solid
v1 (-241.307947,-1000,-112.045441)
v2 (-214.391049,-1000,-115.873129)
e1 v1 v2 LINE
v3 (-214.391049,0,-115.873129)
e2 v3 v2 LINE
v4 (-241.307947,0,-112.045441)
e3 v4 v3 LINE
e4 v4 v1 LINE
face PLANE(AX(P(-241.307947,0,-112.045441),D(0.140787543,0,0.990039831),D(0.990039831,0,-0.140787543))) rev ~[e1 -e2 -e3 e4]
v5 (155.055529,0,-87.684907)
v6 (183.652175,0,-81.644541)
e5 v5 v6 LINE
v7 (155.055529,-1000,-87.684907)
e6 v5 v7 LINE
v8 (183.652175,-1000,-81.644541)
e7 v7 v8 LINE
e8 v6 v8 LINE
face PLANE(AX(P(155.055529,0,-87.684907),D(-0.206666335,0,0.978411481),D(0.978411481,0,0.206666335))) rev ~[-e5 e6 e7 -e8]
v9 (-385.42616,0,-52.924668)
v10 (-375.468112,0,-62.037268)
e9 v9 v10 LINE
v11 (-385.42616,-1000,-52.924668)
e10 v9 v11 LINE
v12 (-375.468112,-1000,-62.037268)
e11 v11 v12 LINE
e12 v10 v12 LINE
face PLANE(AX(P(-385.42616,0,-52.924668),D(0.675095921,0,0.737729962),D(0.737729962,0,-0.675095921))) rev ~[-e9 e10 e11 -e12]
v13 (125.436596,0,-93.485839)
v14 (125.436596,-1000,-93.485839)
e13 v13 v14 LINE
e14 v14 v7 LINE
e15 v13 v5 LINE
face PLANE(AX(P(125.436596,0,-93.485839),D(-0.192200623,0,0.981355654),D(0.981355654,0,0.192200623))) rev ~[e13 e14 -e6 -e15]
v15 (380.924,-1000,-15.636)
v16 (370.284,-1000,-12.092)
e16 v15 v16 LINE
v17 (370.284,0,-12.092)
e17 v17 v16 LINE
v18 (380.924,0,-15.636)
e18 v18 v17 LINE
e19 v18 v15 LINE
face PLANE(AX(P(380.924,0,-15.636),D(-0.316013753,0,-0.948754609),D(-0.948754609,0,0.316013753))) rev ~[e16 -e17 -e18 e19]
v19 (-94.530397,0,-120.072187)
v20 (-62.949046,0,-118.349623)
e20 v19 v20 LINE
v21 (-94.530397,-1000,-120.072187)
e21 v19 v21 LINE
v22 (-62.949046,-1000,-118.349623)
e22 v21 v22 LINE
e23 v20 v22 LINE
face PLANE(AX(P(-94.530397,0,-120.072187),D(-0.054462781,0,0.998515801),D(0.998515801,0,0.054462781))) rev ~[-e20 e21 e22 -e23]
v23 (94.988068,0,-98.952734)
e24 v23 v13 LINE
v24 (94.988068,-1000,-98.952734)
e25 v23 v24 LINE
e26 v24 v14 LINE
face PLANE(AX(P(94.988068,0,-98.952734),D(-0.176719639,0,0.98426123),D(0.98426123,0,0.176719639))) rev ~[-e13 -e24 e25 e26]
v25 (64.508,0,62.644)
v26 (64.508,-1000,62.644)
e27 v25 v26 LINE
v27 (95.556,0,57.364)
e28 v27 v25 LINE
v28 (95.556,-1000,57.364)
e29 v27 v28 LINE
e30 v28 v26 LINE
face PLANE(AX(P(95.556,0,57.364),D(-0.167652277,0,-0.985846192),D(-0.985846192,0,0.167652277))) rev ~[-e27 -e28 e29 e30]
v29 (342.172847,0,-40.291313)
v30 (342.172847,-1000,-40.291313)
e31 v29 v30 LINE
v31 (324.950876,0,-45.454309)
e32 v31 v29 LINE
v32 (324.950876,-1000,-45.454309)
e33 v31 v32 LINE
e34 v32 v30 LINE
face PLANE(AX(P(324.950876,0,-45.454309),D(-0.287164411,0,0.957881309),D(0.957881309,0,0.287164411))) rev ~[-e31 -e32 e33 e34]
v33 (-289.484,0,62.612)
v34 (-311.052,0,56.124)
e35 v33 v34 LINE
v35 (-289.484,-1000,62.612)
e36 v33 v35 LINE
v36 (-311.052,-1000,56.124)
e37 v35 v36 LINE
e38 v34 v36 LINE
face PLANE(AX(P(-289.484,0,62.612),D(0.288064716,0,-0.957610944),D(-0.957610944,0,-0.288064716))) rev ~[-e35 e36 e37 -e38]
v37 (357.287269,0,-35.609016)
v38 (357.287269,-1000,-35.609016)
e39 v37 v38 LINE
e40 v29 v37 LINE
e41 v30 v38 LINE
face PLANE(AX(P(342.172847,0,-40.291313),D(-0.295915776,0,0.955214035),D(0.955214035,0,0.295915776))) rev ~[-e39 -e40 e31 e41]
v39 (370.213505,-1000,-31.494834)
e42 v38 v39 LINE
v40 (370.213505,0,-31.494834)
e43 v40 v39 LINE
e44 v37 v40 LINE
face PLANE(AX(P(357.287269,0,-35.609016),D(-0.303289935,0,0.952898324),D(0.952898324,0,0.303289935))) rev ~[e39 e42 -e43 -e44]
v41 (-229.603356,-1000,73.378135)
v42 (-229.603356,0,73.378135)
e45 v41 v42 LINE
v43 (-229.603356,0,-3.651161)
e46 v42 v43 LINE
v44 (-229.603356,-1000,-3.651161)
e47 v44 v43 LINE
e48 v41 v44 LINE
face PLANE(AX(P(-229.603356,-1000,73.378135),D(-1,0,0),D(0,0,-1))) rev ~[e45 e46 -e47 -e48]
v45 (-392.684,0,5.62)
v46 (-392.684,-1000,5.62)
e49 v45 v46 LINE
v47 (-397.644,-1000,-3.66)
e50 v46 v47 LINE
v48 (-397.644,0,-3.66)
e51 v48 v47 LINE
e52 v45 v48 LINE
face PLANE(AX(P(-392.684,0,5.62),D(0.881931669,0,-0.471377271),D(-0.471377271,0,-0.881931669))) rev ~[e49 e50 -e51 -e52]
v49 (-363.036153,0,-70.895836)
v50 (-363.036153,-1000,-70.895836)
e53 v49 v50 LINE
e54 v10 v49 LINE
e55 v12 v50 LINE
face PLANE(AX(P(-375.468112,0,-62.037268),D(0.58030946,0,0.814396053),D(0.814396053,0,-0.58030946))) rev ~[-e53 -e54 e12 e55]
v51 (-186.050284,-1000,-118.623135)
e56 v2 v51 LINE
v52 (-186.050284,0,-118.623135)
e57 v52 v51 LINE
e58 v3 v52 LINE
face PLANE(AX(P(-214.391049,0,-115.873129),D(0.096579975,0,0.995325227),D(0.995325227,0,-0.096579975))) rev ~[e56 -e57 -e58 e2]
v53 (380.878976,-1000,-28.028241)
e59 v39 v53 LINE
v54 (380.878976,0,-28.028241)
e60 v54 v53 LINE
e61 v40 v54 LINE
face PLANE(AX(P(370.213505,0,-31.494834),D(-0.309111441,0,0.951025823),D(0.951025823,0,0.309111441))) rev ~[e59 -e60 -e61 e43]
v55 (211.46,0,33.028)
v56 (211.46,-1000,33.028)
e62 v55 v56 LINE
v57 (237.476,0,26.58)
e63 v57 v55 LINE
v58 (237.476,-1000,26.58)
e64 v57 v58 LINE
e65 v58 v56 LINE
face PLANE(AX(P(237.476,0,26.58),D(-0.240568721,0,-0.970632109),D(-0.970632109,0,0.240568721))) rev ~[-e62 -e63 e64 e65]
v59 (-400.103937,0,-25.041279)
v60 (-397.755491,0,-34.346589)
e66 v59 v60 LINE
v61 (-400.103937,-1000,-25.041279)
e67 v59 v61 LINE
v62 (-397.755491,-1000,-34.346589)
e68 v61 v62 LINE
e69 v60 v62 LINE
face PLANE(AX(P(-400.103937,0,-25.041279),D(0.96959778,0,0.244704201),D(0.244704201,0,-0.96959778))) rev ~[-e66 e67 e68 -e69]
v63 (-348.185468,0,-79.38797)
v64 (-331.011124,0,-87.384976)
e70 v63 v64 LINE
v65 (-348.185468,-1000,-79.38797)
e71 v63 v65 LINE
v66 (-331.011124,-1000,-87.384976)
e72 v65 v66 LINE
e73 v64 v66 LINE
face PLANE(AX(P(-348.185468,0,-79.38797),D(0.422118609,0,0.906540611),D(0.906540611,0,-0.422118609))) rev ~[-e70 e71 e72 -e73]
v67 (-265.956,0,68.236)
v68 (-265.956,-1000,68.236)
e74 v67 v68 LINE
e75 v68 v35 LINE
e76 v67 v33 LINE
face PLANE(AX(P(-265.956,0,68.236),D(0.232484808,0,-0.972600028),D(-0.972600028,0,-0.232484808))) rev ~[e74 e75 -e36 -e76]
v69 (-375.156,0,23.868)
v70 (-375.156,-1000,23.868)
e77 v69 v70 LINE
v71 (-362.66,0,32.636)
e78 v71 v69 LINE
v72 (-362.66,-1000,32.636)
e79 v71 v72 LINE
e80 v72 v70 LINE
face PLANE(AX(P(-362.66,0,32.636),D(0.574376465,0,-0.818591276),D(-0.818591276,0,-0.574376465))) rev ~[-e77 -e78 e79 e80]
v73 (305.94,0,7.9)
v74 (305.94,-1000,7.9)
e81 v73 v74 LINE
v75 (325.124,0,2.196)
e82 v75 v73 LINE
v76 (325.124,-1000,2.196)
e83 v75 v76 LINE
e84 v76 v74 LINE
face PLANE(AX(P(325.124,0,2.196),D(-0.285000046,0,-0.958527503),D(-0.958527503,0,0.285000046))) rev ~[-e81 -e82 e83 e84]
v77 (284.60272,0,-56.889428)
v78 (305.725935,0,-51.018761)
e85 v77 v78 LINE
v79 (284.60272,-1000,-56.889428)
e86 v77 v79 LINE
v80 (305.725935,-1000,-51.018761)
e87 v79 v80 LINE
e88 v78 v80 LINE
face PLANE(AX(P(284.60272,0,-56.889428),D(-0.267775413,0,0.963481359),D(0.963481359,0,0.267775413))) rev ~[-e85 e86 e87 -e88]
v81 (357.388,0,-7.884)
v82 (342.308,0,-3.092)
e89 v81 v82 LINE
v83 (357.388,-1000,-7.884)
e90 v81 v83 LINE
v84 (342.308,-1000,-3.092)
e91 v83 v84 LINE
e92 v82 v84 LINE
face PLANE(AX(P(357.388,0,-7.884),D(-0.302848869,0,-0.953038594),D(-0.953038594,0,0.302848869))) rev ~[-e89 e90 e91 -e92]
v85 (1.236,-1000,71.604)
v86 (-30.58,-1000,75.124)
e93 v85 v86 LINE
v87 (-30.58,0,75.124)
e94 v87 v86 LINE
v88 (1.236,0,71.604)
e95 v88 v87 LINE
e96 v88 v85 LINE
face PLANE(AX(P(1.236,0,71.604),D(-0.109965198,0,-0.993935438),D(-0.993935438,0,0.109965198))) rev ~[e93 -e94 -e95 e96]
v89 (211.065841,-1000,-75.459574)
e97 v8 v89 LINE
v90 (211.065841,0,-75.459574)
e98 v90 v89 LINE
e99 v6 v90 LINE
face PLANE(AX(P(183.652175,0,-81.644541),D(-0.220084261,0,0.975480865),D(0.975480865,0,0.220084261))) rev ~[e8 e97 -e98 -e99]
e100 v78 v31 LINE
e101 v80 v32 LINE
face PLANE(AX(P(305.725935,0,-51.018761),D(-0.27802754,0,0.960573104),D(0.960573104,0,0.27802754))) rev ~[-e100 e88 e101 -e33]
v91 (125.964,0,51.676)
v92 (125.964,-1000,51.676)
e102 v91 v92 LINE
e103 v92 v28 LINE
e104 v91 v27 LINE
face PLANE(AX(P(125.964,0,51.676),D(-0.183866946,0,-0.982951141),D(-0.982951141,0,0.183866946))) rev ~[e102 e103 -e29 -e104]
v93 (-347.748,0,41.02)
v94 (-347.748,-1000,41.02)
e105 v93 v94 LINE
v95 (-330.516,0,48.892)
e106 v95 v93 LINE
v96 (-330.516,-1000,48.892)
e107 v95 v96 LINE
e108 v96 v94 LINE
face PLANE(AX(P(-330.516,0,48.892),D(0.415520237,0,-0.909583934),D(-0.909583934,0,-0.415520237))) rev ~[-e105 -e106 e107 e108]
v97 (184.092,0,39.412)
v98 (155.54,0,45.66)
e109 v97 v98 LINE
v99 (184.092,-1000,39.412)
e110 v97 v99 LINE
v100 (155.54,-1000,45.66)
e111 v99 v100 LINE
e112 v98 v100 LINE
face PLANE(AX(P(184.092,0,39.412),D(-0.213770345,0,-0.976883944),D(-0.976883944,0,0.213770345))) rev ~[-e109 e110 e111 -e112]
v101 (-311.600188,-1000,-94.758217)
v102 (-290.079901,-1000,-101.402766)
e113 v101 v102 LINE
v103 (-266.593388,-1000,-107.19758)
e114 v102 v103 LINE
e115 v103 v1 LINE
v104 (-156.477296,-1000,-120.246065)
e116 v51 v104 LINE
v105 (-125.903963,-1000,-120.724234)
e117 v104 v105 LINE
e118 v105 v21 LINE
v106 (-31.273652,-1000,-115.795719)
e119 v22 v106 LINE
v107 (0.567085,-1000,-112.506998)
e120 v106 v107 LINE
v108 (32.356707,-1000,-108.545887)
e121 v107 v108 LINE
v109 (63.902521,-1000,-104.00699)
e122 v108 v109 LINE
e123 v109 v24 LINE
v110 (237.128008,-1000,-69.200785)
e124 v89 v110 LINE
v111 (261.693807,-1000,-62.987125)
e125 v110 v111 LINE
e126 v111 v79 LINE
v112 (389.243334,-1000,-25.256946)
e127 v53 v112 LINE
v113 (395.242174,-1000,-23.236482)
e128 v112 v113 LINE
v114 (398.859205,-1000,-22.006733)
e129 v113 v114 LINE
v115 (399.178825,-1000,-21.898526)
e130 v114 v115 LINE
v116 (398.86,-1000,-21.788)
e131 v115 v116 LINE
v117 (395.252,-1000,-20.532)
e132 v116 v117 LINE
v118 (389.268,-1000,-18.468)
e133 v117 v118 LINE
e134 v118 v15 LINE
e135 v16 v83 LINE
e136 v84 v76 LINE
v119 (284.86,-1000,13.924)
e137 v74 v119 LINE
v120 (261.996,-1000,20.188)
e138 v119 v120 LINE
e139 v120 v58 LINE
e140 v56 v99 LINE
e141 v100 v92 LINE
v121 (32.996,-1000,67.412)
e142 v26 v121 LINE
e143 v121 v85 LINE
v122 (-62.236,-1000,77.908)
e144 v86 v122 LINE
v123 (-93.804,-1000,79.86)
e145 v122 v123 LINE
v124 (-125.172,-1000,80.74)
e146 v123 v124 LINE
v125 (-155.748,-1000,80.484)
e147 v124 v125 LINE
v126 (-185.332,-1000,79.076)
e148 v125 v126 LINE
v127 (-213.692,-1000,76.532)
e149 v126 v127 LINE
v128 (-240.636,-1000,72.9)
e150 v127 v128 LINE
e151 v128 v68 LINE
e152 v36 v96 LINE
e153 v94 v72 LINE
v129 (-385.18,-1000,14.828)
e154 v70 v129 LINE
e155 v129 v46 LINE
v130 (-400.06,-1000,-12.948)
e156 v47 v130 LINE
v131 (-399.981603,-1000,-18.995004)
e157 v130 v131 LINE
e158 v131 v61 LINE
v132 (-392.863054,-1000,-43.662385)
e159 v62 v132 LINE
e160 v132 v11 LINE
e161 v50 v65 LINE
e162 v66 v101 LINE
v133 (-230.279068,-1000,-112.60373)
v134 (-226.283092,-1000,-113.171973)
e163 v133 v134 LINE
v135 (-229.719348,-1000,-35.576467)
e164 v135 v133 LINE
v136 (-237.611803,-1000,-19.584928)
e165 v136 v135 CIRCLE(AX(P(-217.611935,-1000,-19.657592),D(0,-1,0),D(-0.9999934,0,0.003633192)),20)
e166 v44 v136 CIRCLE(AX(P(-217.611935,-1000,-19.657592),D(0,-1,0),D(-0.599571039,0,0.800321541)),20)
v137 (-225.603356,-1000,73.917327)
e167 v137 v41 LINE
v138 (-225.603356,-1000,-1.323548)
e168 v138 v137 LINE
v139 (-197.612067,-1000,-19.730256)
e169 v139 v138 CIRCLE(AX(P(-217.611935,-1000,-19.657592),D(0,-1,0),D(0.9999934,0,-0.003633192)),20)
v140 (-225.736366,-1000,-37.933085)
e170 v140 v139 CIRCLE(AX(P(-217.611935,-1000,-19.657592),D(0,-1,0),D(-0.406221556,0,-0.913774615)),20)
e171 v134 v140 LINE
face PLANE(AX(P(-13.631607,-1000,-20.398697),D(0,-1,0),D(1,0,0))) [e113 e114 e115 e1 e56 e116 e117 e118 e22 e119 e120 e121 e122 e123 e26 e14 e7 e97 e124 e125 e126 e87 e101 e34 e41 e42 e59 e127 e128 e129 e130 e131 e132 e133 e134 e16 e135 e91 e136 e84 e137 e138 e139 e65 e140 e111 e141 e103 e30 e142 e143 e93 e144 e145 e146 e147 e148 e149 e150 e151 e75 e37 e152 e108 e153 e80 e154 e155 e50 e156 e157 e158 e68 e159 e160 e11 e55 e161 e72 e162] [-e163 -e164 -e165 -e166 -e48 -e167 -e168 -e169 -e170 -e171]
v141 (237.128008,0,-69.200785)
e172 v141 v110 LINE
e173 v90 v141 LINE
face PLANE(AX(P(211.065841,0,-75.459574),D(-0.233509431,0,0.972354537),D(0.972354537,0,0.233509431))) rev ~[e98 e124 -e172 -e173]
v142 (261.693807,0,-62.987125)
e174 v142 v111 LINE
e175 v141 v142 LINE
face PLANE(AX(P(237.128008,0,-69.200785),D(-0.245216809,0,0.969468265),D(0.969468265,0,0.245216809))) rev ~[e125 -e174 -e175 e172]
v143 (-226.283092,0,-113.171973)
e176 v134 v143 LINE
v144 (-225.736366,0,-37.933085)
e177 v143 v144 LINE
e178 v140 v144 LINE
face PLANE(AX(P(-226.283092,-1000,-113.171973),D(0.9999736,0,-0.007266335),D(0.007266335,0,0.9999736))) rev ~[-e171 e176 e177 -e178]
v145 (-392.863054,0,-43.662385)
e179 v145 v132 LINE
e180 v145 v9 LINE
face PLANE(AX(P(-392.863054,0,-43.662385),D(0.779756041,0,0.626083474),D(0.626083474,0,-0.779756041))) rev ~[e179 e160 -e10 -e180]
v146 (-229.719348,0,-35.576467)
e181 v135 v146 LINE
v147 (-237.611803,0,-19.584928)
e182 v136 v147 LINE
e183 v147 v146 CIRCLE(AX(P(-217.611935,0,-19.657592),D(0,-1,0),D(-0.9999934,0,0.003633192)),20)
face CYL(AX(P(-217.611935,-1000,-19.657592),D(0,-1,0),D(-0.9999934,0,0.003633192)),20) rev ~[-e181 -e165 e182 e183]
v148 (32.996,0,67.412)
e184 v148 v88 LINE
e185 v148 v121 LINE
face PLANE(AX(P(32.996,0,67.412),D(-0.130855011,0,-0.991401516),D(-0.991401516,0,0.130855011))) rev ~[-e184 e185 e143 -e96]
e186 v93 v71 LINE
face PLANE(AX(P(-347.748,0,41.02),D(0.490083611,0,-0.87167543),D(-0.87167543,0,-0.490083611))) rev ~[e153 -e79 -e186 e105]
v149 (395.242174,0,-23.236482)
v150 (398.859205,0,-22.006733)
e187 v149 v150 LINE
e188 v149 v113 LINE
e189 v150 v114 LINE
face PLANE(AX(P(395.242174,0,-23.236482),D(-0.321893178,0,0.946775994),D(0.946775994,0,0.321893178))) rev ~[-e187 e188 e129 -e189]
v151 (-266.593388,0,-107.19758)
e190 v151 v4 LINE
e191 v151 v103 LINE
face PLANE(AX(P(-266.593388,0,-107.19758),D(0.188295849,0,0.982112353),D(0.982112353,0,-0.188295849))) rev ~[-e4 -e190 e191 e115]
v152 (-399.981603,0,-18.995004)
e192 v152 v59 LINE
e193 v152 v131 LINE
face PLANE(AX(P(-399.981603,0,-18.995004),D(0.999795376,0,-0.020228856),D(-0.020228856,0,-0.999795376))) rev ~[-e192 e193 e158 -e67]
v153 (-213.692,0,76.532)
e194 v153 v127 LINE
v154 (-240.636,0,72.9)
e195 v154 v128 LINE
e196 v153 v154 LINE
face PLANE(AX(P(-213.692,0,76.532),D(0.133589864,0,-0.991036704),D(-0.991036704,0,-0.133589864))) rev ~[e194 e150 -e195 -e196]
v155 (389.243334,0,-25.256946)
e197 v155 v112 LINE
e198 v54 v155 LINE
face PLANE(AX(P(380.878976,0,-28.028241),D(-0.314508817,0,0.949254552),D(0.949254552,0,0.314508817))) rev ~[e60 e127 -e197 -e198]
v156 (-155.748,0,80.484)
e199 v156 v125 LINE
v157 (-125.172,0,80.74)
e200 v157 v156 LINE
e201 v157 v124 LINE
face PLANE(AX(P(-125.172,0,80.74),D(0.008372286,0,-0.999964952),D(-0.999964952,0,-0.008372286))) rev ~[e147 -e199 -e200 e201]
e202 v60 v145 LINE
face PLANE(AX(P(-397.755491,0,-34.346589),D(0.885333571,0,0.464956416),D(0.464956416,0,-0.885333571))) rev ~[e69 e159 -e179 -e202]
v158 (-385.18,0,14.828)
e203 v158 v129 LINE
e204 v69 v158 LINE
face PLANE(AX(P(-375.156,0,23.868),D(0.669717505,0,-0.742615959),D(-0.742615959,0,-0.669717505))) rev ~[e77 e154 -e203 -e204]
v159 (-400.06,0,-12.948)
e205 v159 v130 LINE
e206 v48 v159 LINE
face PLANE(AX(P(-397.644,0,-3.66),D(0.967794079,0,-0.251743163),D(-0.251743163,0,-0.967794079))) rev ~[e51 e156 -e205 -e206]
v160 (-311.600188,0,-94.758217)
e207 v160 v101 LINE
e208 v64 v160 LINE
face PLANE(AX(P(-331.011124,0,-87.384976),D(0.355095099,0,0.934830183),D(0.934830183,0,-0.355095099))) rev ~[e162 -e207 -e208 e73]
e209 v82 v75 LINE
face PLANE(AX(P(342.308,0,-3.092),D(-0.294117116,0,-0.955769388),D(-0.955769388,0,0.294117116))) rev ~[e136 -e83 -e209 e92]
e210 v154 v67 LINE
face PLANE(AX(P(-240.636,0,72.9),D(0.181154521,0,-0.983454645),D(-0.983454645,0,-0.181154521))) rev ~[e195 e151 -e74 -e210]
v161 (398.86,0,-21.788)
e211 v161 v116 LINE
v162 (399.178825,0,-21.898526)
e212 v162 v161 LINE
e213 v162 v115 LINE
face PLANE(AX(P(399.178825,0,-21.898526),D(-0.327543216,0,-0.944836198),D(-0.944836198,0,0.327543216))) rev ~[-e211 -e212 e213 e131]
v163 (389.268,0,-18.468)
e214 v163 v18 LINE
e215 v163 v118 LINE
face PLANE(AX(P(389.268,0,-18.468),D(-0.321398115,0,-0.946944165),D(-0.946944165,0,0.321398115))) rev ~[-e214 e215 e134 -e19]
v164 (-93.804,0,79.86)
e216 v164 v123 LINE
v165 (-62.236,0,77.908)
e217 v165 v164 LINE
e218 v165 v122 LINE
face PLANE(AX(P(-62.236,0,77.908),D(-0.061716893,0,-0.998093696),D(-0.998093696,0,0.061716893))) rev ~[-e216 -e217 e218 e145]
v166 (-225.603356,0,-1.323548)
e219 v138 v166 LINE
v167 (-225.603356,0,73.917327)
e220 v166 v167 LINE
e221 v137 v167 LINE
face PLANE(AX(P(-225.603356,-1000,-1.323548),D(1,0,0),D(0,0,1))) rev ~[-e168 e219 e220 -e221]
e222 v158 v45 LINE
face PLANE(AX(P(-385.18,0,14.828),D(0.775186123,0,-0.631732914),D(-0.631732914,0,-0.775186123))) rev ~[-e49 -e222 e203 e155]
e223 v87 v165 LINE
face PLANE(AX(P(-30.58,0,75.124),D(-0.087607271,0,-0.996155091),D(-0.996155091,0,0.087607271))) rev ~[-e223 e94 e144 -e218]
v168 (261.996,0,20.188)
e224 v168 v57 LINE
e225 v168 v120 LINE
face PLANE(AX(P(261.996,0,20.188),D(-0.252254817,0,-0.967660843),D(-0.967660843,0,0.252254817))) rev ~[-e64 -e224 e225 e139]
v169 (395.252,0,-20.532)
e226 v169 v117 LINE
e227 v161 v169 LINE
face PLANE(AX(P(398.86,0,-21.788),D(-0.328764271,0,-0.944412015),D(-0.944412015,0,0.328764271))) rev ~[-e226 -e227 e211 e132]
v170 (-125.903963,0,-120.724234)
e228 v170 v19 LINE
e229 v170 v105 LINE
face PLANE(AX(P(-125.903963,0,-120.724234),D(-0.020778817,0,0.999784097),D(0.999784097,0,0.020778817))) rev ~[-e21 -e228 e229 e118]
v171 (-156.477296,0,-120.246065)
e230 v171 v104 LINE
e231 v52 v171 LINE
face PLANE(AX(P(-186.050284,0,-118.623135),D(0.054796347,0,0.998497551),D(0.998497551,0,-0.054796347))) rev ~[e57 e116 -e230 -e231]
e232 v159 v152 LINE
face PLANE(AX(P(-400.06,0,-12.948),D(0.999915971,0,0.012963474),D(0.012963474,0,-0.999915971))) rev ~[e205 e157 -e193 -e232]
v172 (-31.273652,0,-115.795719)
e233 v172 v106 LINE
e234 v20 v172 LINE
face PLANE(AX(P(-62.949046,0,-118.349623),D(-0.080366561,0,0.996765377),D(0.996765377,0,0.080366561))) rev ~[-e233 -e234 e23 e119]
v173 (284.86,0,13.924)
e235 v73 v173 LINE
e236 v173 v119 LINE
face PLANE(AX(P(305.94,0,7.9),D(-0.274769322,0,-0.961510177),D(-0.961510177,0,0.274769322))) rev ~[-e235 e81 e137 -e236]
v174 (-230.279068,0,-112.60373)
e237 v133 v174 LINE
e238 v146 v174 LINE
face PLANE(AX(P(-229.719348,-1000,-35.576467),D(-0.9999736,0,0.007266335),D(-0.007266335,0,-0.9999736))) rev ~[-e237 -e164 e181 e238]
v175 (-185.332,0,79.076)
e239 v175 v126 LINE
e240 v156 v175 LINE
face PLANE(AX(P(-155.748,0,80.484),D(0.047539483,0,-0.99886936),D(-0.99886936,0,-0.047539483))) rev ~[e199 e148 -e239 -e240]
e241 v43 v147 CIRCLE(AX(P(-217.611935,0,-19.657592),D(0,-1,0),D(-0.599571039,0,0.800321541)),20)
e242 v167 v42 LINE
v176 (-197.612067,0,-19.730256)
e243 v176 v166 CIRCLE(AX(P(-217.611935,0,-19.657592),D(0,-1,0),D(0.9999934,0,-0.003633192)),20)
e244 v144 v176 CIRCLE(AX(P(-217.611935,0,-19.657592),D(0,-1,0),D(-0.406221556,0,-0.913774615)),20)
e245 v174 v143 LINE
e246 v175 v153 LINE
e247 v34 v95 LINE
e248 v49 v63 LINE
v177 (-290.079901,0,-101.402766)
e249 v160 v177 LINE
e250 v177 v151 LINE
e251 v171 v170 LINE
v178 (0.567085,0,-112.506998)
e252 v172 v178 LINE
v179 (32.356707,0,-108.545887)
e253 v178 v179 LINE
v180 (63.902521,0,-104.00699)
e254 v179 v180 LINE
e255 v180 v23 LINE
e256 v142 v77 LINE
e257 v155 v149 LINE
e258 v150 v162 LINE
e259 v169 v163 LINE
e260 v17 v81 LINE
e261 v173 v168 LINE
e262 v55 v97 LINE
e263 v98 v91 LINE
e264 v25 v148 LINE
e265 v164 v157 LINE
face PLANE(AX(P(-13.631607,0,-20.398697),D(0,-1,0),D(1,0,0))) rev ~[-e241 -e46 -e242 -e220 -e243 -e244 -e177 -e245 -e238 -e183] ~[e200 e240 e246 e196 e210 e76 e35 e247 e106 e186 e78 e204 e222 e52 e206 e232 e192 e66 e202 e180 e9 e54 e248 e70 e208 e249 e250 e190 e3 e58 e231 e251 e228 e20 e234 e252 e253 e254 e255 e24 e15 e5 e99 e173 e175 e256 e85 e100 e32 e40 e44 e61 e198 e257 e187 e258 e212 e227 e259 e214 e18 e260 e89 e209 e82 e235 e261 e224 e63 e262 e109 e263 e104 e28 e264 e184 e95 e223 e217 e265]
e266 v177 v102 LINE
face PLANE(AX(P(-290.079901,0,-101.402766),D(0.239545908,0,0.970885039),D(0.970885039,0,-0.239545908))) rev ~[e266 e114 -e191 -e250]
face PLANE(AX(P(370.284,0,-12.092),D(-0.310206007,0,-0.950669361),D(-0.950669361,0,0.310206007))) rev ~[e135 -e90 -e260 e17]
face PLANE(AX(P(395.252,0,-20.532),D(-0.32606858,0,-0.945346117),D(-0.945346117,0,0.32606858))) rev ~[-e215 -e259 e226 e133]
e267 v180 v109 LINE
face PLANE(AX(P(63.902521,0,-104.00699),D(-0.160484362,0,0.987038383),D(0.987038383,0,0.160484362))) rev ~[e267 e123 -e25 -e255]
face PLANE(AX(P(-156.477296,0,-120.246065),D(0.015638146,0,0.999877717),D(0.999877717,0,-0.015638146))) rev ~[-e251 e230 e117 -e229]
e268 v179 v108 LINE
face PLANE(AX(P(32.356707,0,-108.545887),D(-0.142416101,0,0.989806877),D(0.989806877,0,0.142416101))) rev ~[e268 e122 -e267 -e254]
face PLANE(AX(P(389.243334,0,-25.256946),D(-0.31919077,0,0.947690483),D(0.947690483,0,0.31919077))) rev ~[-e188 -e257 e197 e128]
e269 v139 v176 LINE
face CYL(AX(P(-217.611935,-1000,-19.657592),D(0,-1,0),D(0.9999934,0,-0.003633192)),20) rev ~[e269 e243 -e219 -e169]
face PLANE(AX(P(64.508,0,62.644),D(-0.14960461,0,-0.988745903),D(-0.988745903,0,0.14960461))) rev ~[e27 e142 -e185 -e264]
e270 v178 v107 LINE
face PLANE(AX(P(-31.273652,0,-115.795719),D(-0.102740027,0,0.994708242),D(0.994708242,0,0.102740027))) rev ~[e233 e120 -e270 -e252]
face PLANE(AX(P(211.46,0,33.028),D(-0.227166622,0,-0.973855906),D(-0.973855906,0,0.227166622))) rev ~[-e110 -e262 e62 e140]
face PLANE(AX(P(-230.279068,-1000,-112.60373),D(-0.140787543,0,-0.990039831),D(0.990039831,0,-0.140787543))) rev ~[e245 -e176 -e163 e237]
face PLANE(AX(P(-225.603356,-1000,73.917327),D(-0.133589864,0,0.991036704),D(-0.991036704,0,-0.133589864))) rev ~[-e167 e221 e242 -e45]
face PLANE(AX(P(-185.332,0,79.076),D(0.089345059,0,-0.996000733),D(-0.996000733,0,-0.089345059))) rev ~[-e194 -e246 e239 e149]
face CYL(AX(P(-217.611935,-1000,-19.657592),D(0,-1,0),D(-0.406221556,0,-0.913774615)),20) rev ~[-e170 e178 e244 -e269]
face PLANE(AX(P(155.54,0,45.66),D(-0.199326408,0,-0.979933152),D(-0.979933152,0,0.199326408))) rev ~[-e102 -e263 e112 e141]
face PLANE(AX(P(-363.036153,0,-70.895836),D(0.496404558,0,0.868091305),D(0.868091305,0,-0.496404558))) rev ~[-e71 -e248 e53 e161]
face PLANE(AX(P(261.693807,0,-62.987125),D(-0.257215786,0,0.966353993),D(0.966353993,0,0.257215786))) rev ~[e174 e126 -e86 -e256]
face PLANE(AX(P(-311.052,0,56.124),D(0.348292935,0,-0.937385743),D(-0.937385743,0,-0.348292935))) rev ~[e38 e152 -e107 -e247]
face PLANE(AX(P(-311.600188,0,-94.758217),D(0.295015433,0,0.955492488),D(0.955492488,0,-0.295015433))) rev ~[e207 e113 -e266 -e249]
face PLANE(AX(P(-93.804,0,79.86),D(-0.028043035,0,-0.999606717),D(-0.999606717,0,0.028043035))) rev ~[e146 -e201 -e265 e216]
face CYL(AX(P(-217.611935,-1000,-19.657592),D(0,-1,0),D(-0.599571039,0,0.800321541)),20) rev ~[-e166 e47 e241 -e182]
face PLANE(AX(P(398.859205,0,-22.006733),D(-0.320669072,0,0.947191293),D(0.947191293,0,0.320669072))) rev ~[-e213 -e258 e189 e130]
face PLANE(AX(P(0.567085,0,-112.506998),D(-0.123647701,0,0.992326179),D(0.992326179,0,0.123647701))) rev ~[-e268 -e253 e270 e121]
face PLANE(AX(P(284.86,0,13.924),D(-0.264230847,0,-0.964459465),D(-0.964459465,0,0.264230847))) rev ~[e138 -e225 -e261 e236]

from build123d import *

# Parameters (mm, degrees)
F1_DEPTH = 1000
F3_DEPTH = 1000
F4_DEPTH = 1100


# Not quite as in the source:
# - a feature names something its author has since deleted; it is built from what else it names


with BuildPart() as f1:
    # F0 (on Front) → F1 (new body)
    with BuildSketch(Plane.XZ):
        Polygon((398.8592052974, -22.0067325898), (399.1788252872, -21.8985260996), (398.86, -21.788), (395.252, -20.532), (389.268, -18.468), (380.924, -15.636), (370.284, -12.092), (357.388, -7.884), (342.308, -3.092), (325.124, 2.196), (305.94, 7.9), (284.86, 13.924), (261.996, 20.188), (237.476, 26.58), (211.46, 33.028), (184.092, 39.412), (155.54, 45.66), (125.964, 51.676), (95.556, 57.364), (64.508, 62.644), (32.996, 67.412), (1.236, 71.604), (-30.58, 75.124), (-62.236, 77.908), (-93.804, 79.86), (-125.172, 80.74), (-155.748, 80.484), (-185.332, 79.076), (-213.692, 76.532), (-240.636, 72.9), (-265.956, 68.236), (-289.484, 62.612), (-311.052, 56.124), (-330.516, 48.892), (-347.748, 41.02), (-362.66, 32.636), (-375.156, 23.868), (-385.18, 14.828), (-392.684, 5.62), (-397.644, -3.66), (-400.06, -12.948), (-399.9816032326, -18.9950039949), (-400.1039374883, -25.0412786908), (-397.7554909925, -34.3465889519), (-392.863053528, -43.6623849811), (-385.4261600494, -52.9246684677), (-375.4681123548, -62.0372675544), (-363.0361534783, -70.8958362025), (-348.1854681119, -79.3879704541), (-331.0111236302, -87.3849761202), (-311.6001876192, -94.7582171427), (-290.0799010007, -101.4027661761), (-266.5933880129, -107.1975800363), (-241.3079466524, -112.0454405133), (-214.3910493078, -115.8731287637), (-186.0502835732, -118.6231348681), (-156.4772955956, -120.2460649573), (-125.9039629887, -120.7242336641), (-94.530396734, -120.0721872989), (-62.949046248, -118.3496225018), (-31.2736524944, -115.7957191071), (0.567085058, -112.5069977565), (32.356707066, -108.5458872321), (63.9025210304, -104.006989863), (94.988067608, -98.9527344313), (125.4365957465, -93.4858393163), (155.0555292079, -87.6849072697), (183.6521754929, -81.6445406207), (211.0658412572, -75.4595742212), (237.1280077599, -69.2007854261), (261.6938068426, -62.9871247152), (284.602719553, -56.8894275739), (305.7259354409, -51.0187609546), (324.9508761562, -45.4543089157), (342.1728468763, -40.2913132239), (357.2872690402, -35.6090160683), (370.2135053222, -31.494833819), (380.8789763165, -28.0282411878), (389.2433342948, -25.256946254), (395.2421740321, -23.2364824938), align=None)
    extrude(amount=F1_DEPTH)

    # F2 (on face) → F3 (cut)
    with BuildSketch(Plane.XZ.offset(1000)):
        with BuildLine():
            ThreePointArc((-229.6033561446, -3.6511614936), (-235.4817946773, -10.6760485755), (-237.6118033553, -19.5849284785))
            Line((-237.6118033553, -19.5849284785), (-197.6120673578, -19.7302561417))
            ThreePointArc((-197.6120673578, -19.7302561417), (-206.6231942764, -2.9468900665), (-225.6033561446, -1.3235476449))
            Line((-225.6033561446, -1.3235476449), (-225.6033561446, 73.9173274625))
            Line((-225.6033561446, 73.9173274625), (-229.6033561446, 73.3781350635))
            Line((-229.6033561446, 73.3781350635), (-229.6033561446, -3.6511614936))
        make_face()
        with BuildLine():
            Line((-197.6120673578, -19.7302561417), (-237.6118033553, -19.5849284785))
            ThreePointArc((-237.6118033553, -19.5849284785), (-235.5465858175, -28.5090505427), (-229.7193476609, -35.5764668712))
            ThreePointArc((-229.7193476609, -35.5764668712), (-227.7962509426, -36.8703700071), (-225.736366484, -37.9330846114))
            ThreePointArc((-225.736366484, -37.9330846114), (-206.744909945, -36.4477012646), (-197.6120673578, -19.7302561417))
        make_face()
        with BuildLine():
            ThreePointArc((-225.736366484, -37.9330846114), (-227.7962509426, -36.8703700071), (-229.7193476609, -35.5764668712))
            Line((-229.7193476609, -35.5764668712), (-230.2790683503, -112.6037298424))
            Line((-230.2790683503, -112.6037298424), (-226.2830919036, -113.1719733475))
            Line((-226.2830919036, -113.1719733475), (-225.736366484, -37.9330846114))
        make_face()
    extrude(amount=-F3_DEPTH, mode=Mode.SUBTRACT)

    # F2 (on face) → F4 (cut)
    with BuildSketch(Plane.XZ.offset(1000)):
        with BuildLine():
            ThreePointArc((-229.6033561446, -3.6511614936), (-235.4817946773, -10.6760485755), (-237.6118033553, -19.5849284785))
            Line((-237.6118033553, -19.5849284785), (-197.6120673578, -19.7302561417))
            ThreePointArc((-197.6120673578, -19.7302561417), (-206.6231942764, -2.9468900665), (-225.6033561446, -1.3235476449))
            Line((-225.6033561446, -1.3235476449), (-225.6033561446, 73.9173274625))
            Line((-225.6033561446, 73.9173274625), (-229.6033561446, 73.3781350635))
            Line((-229.6033561446, 73.3781350635), (-229.6033561446, -3.6511614936))
        make_face()
        with BuildLine():
            Line((-197.6120673578, -19.7302561417), (-237.6118033553, -19.5849284785))
            ThreePointArc((-237.6118033553, -19.5849284785), (-235.5465858175, -28.5090505427), (-229.7193476609, -35.5764668712))
            ThreePointArc((-229.7193476609, -35.5764668712), (-227.7962509426, -36.8703700071), (-225.736366484, -37.9330846114))
            ThreePointArc((-225.736366484, -37.9330846114), (-206.744909945, -36.4477012646), (-197.6120673578, -19.7302561417))
        make_face()
        with BuildLine():
            ThreePointArc((-225.736366484, -37.9330846114), (-227.7962509426, -36.8703700071), (-229.7193476609, -35.5764668712))
            Line((-229.7193476609, -35.5764668712), (-230.2790683503, -112.6037298424))
            Line((-230.2790683503, -112.6037298424), (-226.2830919036, -113.1719733475))
            Line((-226.2830919036, -113.1719733475), (-225.736366484, -37.9330846114))
        make_face()
    extrude(amount=-F4_DEPTH, mode=Mode.SUBTRACT)


solid = f1.part
